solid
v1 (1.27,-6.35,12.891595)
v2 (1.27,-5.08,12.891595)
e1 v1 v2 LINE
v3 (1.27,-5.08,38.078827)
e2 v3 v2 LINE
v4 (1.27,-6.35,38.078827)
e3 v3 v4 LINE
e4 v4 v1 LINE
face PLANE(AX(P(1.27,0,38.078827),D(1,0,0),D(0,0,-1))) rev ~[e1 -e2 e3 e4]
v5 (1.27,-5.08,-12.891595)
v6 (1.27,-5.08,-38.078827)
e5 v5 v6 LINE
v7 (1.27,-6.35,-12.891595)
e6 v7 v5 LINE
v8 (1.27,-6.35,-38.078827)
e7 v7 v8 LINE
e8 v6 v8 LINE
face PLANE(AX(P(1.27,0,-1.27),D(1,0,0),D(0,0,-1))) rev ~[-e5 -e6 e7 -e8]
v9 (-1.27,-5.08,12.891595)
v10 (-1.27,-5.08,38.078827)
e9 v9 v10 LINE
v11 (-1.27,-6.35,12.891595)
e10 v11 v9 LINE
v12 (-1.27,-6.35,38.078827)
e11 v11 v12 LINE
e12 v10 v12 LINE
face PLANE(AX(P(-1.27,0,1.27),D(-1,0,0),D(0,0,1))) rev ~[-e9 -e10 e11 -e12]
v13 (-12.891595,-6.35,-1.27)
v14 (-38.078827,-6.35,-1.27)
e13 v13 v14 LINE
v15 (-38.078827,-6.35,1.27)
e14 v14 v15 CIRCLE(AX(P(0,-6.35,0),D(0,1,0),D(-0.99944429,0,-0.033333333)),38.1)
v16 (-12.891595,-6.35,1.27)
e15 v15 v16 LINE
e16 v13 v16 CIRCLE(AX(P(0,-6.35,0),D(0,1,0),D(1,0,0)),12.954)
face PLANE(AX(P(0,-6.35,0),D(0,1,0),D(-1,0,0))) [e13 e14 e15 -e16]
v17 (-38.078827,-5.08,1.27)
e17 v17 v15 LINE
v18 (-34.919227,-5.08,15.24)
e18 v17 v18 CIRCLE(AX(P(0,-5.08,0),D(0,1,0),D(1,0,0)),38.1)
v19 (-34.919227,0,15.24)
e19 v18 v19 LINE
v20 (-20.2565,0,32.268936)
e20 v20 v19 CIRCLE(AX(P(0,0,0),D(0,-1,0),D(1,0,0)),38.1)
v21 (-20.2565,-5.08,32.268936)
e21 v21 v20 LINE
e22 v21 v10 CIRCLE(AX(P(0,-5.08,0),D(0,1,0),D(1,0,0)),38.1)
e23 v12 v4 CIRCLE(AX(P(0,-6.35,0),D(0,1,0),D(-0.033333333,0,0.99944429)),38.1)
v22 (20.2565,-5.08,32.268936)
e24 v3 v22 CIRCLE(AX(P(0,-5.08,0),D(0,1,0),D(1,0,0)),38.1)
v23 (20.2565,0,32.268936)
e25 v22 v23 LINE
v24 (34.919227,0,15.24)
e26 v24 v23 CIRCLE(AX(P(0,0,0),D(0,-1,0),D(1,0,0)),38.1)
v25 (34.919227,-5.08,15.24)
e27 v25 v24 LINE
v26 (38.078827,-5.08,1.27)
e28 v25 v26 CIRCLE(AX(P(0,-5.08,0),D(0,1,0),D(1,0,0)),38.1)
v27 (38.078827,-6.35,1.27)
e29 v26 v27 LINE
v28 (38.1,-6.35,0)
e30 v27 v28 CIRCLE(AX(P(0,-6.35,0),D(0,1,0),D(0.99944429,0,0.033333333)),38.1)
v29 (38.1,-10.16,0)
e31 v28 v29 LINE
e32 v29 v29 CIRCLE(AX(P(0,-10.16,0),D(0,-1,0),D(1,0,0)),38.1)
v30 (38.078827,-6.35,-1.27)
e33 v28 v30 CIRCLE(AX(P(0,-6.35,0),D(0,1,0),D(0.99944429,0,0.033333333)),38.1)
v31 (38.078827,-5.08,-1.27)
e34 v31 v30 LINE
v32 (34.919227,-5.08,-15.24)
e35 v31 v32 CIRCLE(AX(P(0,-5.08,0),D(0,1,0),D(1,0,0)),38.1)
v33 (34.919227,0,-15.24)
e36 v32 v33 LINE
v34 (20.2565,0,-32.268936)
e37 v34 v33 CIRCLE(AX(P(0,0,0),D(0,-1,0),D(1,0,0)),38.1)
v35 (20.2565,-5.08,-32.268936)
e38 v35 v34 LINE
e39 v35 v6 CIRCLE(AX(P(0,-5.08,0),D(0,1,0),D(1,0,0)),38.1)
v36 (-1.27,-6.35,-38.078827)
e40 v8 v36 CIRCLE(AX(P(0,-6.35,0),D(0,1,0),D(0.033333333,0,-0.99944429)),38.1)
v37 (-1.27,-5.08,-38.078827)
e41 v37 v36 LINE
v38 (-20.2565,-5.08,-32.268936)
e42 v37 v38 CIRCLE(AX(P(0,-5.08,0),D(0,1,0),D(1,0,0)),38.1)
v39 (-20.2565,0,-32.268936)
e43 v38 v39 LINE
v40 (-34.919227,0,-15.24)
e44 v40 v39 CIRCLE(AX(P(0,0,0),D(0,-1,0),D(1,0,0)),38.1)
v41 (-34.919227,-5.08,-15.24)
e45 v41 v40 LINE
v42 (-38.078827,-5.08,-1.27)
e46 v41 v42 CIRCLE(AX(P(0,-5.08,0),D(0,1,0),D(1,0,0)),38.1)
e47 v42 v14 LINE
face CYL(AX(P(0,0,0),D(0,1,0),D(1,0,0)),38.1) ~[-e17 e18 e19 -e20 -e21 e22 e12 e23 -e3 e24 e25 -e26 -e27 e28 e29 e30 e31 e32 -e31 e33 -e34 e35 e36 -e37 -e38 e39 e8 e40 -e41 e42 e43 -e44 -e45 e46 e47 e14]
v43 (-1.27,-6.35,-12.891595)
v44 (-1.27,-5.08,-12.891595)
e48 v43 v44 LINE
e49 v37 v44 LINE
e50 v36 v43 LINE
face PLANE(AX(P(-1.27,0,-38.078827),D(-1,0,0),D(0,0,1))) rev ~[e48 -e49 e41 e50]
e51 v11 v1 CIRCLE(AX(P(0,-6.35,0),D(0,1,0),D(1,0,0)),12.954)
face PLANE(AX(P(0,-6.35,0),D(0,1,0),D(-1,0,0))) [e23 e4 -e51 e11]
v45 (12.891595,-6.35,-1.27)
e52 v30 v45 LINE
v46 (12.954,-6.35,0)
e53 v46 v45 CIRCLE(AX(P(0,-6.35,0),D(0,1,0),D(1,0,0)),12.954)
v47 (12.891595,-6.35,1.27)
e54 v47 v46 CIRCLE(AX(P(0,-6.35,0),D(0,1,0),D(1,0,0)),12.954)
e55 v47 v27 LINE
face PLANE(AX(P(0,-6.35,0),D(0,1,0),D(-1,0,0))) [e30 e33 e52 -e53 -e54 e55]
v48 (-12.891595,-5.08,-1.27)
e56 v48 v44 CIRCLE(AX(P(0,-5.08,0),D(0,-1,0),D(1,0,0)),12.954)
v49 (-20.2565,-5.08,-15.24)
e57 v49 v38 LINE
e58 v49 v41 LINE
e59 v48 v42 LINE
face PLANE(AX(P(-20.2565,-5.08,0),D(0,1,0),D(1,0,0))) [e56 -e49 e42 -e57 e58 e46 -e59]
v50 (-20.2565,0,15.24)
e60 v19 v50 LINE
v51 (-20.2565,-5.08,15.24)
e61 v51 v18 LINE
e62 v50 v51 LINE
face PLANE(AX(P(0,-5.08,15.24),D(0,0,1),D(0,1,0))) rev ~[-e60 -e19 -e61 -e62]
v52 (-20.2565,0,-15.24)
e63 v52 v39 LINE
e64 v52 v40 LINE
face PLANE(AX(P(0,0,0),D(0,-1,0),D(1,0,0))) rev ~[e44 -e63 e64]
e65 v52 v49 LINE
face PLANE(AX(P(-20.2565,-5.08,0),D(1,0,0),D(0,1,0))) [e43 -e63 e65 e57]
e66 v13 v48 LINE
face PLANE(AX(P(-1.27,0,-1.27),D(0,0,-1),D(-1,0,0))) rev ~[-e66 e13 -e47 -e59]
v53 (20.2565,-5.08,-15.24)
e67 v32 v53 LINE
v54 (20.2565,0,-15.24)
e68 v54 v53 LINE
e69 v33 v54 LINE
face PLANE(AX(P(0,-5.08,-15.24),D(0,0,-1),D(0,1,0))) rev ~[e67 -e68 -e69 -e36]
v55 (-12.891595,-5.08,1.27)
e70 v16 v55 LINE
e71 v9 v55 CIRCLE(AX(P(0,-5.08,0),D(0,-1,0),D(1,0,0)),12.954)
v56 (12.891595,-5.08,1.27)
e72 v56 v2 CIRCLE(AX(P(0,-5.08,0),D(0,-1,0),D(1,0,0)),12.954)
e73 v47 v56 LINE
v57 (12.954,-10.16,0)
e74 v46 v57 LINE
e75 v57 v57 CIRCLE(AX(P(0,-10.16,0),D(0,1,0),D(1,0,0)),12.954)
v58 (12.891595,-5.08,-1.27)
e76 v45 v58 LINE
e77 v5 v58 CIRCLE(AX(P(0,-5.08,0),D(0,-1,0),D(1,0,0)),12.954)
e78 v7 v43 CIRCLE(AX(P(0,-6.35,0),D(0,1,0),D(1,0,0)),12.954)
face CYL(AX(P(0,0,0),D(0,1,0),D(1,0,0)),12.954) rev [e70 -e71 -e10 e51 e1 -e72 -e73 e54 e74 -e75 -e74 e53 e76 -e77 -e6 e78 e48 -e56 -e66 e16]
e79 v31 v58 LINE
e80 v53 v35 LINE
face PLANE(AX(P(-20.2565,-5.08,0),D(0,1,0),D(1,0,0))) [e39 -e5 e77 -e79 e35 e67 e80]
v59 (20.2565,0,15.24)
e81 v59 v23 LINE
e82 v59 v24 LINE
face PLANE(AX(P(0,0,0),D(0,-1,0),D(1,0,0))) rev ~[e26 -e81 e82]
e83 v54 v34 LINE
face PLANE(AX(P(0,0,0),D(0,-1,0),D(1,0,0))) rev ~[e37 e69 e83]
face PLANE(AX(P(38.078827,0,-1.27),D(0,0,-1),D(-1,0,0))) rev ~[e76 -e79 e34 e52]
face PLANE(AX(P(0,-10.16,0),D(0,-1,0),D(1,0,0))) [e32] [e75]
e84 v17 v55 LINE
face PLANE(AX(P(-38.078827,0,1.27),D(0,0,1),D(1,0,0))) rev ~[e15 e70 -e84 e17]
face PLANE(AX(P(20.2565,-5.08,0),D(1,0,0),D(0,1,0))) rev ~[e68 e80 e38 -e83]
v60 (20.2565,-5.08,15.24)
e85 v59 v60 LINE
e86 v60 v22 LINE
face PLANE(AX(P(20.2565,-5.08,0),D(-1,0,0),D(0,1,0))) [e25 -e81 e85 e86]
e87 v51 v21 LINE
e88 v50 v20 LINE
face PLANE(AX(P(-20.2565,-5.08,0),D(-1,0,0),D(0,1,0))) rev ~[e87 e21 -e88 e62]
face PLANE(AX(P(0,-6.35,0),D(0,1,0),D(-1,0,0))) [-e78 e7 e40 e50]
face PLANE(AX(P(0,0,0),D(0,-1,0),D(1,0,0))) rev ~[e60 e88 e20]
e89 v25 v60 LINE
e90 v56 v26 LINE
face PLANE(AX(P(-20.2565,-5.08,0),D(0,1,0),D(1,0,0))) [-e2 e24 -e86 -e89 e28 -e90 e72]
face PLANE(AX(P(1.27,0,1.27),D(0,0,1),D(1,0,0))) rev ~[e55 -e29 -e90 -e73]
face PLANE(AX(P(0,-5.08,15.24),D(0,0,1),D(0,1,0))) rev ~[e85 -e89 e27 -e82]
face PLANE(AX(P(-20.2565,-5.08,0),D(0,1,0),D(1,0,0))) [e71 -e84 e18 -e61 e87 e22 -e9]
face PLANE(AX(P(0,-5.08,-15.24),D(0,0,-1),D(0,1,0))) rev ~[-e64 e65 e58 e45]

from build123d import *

# Parameters (mm, degrees)
F0_R          = 12.7
F1_DEPTH      = 17.78
F2_R          = 38.1
F3_DEPTH      = 10.16
F4_R          = 12.954
F5_DEPTH      = 17.781
F5_DEPTH_BACK = 115
F6_W          = 5.08
F6_H          = 30.48
F7_DEPTH      = 38.101
F7_DEPTH_BACK = 38.101
F8_W          = 40.513
F8_H          = 5.08
F9_DEPTH      = 38.101
F9_DEPTH_BACK = 38.101
F11_DEPTH     = 6.35


# Not quite as in the source:
# - an extrude ends at something that could not be found from the text; its depth is read off the source's solid


with BuildPart() as f1:
    # F0 (on Front) → F1 (new body)
    with BuildSketch(Plane.XZ):
        Circle(F0_R)
    extrude(amount=F1_DEPTH)

    # F2 (on Front) → F3 (join)
    with BuildSketch(Plane.XZ):
        Circle(F2_R)
    extrude(amount=F3_DEPTH)

    # F4 (on Front) → F5 (cut, two sides)
    with BuildSketch(Plane.XZ) as f5_sk:
        Circle(F4_R)
    extrude(amount=F5_DEPTH, mode=Mode.SUBTRACT)
    extrude(f5_sk.sketch, amount=-F5_DEPTH_BACK, mode=Mode.SUBTRACT)

    # F6 (on Right) → F7 (cut, two sides)
    with BuildSketch(Plane.YZ) as f7_sk:
        with Locations((-2.54, 0)):
            Rectangle(F6_W, F6_H)
    extrude(amount=F7_DEPTH, mode=Mode.SUBTRACT)
    extrude(f7_sk.sketch, amount=-F7_DEPTH_BACK, mode=Mode.SUBTRACT)

    # F8 (on Top) → F9 (cut, two sides)
    with BuildSketch(Plane.XY) as f9_sk:
        with Locations((0, -2.54)):
            Rectangle(F8_W, F8_H)
    extrude(amount=-F9_DEPTH, mode=Mode.SUBTRACT)
    extrude(f9_sk.sketch, amount=F9_DEPTH_BACK, mode=Mode.SUBTRACT)

    # F10 (on face) → F11 (cut)
    with BuildSketch(Plane(origin=(0, 0, 0), x_dir=(-1, 0, 0), z_dir=(0, 1, 0))):
        with BuildLine():
            Line((1.27, -1.27), (38.0788274504, -1.27))
            ThreePointArc((38.0788274504, -1.27), (38.1, 0), (38.0788274504, 1.27))
            Line((38.0788274504, 1.27), (1.27, 1.27))
            Line((1.27, 1.27), (1.27, 38.0788274504))
            ThreePointArc((1.27, 38.0788274504), (0, 38.1), (-1.27, 38.0788274504))
            Line((-1.27, 38.0788274504), (-1.27, 1.27))
            Line((-1.27, 1.27), (-38.0788274504, 1.27))
            ThreePointArc((-38.0788274504, 1.27), (-38.1, 0), (-38.0788274504, -1.27))
            Line((-38.0788274504, -1.27), (-1.27, -1.27))
            Line((-1.27, -1.27), (-1.27, -38.0788274504))
            ThreePointArc((-1.27, -38.0788274504), (0, -38.1), (1.27, -38.0788274504))
            Line((1.27, -38.0788274504), (1.27, -1.27))
        make_face()
    extrude(amount=-F11_DEPTH, mode=Mode.SUBTRACT)


solid = f1.part
